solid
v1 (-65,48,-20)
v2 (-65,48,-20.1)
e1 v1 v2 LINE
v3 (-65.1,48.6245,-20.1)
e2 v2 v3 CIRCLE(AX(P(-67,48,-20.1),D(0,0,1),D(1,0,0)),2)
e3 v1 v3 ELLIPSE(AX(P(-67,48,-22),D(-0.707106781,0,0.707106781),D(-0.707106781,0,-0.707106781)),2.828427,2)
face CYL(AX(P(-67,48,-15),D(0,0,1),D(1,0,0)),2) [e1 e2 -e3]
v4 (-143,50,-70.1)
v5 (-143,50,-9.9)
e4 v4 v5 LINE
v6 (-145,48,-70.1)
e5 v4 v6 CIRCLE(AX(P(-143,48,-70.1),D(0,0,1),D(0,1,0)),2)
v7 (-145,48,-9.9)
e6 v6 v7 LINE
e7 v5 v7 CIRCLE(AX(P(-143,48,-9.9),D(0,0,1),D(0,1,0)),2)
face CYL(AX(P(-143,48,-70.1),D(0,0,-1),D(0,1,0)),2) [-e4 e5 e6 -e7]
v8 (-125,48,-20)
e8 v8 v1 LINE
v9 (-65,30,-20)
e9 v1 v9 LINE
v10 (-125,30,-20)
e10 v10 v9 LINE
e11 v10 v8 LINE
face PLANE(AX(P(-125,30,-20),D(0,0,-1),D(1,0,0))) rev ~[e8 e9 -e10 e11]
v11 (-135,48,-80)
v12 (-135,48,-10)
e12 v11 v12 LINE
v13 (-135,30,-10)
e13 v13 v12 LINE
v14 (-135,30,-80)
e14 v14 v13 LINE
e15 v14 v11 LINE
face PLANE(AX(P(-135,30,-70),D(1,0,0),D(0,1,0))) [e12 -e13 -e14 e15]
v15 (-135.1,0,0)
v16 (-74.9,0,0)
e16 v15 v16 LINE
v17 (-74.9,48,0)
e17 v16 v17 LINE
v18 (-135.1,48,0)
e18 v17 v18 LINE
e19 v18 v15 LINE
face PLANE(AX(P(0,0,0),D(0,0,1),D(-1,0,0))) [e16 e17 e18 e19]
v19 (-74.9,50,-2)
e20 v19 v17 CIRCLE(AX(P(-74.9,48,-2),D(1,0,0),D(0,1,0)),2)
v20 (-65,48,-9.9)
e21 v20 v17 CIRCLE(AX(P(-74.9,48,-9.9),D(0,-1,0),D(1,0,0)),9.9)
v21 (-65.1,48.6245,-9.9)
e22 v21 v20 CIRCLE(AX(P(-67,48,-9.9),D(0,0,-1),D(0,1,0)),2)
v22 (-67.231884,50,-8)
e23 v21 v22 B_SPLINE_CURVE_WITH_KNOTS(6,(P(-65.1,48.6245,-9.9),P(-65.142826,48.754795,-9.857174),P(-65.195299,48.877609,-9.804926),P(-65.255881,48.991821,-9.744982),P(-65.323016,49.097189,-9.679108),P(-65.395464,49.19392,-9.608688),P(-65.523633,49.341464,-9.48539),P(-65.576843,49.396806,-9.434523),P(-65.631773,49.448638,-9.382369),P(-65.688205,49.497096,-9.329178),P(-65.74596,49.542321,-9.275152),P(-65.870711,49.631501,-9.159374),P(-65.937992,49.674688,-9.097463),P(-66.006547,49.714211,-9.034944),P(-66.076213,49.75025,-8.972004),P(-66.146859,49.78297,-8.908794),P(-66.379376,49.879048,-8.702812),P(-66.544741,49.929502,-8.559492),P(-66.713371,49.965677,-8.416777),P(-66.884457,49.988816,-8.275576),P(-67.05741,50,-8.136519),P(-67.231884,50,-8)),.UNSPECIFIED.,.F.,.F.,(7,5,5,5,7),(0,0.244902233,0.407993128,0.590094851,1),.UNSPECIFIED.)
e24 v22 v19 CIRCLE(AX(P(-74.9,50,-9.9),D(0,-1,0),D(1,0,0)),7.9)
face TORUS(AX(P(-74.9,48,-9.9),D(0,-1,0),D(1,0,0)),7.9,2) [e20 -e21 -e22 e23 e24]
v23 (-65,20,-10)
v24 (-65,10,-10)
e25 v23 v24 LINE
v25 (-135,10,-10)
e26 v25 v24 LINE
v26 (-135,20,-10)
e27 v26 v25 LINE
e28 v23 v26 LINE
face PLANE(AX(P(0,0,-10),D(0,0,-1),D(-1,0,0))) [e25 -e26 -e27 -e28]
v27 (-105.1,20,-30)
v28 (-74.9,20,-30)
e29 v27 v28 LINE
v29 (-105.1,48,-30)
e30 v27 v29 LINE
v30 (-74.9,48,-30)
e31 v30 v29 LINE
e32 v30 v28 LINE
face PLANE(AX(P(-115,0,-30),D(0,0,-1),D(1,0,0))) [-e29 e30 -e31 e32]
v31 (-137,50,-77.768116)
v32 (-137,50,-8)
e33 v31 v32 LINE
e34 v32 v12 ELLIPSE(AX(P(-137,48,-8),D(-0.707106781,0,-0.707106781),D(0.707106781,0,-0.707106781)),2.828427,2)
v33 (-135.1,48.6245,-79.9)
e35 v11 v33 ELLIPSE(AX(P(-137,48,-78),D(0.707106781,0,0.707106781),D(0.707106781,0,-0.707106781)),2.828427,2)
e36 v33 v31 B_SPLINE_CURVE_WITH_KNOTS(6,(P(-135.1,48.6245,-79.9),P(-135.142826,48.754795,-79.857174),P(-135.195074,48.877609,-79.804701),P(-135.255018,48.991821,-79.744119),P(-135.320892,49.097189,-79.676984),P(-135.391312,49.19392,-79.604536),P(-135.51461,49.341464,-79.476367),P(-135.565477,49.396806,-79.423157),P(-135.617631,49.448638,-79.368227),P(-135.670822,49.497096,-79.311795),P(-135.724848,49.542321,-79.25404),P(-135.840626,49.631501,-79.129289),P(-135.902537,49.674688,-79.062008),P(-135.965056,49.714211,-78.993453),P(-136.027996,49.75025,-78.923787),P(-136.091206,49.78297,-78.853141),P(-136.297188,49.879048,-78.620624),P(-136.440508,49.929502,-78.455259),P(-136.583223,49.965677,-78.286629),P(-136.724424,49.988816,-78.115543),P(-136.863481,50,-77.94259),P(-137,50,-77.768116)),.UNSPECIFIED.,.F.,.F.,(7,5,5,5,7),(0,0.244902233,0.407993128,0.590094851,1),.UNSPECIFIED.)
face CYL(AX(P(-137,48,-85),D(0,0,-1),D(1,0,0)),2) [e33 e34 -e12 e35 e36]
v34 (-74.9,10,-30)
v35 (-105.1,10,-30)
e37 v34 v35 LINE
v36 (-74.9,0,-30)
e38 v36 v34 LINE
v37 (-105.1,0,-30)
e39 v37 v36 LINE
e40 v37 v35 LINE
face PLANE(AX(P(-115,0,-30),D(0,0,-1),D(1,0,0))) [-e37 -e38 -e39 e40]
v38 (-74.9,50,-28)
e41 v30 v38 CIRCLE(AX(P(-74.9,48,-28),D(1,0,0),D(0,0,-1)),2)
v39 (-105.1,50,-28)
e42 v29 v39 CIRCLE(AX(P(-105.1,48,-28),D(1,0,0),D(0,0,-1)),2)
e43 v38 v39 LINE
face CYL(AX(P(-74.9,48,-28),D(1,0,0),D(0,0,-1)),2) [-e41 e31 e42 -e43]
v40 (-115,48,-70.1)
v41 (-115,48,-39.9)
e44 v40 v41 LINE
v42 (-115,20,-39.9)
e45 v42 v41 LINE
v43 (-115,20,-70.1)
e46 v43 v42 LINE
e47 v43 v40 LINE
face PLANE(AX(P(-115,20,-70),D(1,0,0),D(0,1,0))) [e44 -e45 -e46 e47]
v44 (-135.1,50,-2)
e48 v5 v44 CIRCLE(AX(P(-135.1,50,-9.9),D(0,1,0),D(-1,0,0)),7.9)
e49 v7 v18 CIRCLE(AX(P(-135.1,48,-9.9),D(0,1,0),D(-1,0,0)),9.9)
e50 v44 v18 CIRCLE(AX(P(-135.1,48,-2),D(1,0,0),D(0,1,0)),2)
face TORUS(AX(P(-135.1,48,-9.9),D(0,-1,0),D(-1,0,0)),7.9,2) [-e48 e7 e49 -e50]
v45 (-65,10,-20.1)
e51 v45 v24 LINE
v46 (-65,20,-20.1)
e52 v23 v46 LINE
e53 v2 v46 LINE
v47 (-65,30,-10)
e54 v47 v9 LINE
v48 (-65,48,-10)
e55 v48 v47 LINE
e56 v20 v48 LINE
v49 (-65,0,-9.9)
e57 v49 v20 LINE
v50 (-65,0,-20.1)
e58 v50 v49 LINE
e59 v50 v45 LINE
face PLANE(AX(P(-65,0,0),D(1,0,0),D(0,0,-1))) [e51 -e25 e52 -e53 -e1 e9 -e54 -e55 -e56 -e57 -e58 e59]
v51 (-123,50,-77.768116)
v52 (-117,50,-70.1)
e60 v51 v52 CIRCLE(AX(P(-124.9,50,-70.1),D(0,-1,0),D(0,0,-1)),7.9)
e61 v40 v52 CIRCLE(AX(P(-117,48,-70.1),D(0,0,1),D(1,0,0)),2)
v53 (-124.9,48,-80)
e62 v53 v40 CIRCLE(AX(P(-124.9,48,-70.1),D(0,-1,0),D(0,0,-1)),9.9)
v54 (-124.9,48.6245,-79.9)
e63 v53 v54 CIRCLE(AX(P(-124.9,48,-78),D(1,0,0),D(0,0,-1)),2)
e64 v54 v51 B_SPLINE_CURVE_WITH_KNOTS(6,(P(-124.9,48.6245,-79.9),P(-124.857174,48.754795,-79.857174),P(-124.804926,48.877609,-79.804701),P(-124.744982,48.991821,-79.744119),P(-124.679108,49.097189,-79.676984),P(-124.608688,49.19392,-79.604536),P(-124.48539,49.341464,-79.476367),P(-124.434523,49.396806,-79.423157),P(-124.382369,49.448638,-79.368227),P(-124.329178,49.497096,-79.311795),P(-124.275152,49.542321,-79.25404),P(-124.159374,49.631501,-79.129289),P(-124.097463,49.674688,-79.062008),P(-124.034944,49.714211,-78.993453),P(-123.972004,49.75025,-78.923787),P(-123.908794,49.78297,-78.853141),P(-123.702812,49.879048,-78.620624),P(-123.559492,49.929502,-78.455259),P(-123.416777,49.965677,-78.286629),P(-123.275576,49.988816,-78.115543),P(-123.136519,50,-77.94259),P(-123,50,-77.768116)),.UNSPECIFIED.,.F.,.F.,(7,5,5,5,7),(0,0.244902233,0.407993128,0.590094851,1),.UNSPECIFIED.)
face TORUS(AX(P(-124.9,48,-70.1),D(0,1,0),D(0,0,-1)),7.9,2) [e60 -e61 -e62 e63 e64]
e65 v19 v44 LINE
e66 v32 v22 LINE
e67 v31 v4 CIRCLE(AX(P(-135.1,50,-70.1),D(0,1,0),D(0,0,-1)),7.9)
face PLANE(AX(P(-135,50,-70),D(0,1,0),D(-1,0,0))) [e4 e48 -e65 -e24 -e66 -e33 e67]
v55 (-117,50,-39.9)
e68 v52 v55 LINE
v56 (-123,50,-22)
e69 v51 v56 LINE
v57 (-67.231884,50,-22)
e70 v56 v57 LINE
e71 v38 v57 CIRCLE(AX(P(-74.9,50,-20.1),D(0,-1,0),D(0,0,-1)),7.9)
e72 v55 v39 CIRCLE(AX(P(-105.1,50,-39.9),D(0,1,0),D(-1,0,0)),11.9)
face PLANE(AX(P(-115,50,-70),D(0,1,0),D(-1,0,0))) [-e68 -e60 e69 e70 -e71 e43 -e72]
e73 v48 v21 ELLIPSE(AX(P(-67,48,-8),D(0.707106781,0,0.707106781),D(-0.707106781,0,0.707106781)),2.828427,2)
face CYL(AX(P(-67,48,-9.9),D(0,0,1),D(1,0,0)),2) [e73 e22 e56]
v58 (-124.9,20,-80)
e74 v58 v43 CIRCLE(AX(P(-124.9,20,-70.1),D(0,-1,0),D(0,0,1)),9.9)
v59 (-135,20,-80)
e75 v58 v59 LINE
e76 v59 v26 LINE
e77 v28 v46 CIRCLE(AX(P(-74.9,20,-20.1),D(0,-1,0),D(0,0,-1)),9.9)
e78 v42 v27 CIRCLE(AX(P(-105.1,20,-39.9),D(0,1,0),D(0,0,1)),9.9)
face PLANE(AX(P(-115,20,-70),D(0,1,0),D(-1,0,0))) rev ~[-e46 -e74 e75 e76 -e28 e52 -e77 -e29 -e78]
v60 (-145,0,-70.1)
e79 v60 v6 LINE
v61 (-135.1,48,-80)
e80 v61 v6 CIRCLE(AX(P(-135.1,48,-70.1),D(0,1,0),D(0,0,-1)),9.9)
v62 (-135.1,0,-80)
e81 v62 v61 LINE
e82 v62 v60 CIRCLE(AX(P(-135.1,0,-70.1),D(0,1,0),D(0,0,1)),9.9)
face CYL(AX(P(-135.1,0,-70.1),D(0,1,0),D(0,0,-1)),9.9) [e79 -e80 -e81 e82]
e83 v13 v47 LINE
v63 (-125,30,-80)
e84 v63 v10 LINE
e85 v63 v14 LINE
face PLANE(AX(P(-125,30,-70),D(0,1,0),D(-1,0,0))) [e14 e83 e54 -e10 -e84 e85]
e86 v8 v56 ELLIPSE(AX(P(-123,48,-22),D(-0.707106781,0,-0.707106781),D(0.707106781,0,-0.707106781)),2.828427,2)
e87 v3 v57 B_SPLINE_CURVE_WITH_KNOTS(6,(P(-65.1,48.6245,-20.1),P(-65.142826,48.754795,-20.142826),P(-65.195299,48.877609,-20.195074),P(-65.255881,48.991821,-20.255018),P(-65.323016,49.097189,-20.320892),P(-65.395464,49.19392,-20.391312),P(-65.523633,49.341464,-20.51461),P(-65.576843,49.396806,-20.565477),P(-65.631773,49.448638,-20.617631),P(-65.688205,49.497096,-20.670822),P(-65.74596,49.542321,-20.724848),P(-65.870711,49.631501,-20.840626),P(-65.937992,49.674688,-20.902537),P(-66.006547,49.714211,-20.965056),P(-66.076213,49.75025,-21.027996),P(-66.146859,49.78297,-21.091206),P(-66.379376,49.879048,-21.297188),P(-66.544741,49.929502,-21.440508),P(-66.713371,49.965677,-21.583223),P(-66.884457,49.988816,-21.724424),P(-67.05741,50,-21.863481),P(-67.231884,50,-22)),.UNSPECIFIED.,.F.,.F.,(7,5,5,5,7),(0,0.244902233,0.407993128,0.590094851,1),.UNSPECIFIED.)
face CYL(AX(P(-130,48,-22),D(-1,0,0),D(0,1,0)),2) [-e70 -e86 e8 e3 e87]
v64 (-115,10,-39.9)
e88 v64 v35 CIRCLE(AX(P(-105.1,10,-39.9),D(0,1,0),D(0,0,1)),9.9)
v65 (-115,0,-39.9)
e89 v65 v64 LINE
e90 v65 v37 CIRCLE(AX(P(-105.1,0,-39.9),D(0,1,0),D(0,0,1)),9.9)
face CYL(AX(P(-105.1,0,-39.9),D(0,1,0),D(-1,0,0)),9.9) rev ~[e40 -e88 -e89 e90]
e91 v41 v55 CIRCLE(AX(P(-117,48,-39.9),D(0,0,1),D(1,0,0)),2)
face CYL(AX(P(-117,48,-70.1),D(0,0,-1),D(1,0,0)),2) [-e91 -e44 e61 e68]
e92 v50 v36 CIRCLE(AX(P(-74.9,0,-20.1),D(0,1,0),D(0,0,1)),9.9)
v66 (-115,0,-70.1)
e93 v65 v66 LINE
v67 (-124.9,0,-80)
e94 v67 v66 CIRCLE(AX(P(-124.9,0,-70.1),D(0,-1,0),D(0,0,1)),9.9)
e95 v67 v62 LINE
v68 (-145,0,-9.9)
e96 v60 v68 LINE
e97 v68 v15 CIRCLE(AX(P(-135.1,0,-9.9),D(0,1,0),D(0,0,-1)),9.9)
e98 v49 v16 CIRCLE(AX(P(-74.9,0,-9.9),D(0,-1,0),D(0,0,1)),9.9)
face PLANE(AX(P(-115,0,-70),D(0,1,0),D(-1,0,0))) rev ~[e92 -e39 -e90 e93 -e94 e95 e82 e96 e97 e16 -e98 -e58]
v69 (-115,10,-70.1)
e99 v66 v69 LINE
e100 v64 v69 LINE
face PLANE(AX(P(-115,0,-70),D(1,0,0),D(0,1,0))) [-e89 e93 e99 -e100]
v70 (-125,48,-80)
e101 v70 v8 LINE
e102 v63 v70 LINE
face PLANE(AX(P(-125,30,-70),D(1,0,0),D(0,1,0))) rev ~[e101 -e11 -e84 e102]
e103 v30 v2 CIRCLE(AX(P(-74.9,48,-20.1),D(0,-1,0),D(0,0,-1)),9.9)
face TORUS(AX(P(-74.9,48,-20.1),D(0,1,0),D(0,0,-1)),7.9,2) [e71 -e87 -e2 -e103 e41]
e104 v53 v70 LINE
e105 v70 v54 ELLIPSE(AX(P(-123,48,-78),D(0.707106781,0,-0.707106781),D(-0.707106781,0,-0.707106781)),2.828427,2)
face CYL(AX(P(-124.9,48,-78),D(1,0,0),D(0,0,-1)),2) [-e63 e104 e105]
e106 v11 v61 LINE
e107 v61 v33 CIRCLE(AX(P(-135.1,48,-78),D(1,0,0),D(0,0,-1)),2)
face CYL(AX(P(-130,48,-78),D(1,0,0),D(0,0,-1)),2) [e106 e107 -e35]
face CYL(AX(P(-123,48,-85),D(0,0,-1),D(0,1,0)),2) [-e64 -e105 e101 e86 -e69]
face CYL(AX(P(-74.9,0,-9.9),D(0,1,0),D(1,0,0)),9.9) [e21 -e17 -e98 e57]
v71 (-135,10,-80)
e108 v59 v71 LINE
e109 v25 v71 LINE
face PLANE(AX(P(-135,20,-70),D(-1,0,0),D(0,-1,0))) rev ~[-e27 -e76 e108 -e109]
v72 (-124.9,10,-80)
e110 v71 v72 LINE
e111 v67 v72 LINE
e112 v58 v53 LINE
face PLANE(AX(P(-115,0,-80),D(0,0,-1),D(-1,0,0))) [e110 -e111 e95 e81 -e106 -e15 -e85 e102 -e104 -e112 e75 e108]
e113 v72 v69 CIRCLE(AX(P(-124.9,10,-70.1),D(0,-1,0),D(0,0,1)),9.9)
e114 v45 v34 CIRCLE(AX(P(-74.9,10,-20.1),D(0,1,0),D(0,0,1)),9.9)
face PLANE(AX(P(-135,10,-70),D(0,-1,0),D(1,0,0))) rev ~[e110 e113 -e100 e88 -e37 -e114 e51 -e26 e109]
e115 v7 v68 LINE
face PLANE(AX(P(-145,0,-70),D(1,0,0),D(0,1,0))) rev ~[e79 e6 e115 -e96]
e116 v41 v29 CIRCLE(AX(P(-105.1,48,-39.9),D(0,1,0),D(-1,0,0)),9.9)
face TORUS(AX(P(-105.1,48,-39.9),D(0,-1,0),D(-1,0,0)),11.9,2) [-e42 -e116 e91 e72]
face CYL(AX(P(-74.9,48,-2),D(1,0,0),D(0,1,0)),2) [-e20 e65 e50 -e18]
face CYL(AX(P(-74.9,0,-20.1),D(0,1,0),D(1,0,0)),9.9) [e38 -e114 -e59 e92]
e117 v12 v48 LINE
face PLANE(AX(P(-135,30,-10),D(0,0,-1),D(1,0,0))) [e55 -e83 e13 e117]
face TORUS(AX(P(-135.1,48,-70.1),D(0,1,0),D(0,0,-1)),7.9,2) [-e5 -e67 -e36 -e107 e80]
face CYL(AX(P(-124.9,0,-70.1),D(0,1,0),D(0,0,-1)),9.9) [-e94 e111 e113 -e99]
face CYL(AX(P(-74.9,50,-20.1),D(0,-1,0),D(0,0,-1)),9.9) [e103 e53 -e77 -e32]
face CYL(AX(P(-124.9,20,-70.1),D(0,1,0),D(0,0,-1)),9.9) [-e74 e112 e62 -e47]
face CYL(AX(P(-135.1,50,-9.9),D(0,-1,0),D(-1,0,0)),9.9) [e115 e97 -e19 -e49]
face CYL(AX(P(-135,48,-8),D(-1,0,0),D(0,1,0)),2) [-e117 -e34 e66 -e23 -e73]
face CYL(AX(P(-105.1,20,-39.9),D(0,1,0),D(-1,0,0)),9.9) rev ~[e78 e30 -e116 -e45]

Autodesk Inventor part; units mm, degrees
ref_plane "YZ Plane" through (0, 0, 0) normal (1, 0, 0) x (0, 1, 0)
ref_plane "XZ Plane" through (0, 0, 0) normal (0, 1, 0) x (-1, 0, 0)
ref_plane "XY Plane" through (0, 0, 0) normal (0, 0, 1) x (1, 0, 0)
sketch "Sketch1" plane through (0, 0, 0) normal (0, 1, 0) x (-1, 0, 0)
  line L0 (0, 0) -> (145, 0)
  line L1 (145, 0) -> (145, -30)
  line L2 (145, -30) -> (0, -30)
  line L3 (0, -30) -> (0, 0)
  line L4 (145, 0) -> (115, 0)
  line L5 (115, 0) -> (115, -70)
  line L6 (115, -70) -> (145, -70)
  line L7 (145, -70) -> (145, 0)
  point P0 (115, -30)
  dimension "d0" = 145
  dimension "d1" = 30
  dimension "d2" = 30
  dimension "d3" = 70
extrude "Extrusion1" add sketch "Sketch1" along normal blind 30
sketch "Sketch2" plane through (0, 0, -30) normal (0, 0, -1) x (-1, 0, 0)
  line L0 (0, 20) -> (135, 20)
  line L1 (135, 20) -> (135, 10)
  line L2 (135, 10) -> (0, 10)
  line L3 (0, 10) -> (0, 20)
  dimension "d32" = 135
  dimension "d33" = 10
extrude "Extrusion2" cut sketch "Sketch2" along normal blind 50 and the other way blind 20
sketch "Sketch4" plane through (0, 30, 0) normal (0, 1, 0) x (1, 0, 0)
  line L0 (0, 0) -> (-145, 0)
  line L1 (-145, 0) -> (-145, 10)
  line L2 (-145, 10) -> (0, 10)
  line L3 (0, 10) -> (0, 0)
  line L4 (-115, 70) -> (-145, 70) projected
  line L5 (-145, 70) -> (-135, 70)
  line L6 (-135, 70) -> (-135, 10)
  line L7 (-135, 10) -> (-145, 10)
  line L8 (-145, 10) -> (-145, 70)
  line L9 (-115, 30) -> (-115, 70) projected
  line L10 (-115, 70) -> (-125, 70)
  line L11 (-125, 70) -> (-125, 30)
  line L12 (-125, 30) -> (-115, 30)
  line L13 (-115, 30) -> (-115, 70)
  line L14 (0, 30) -> (-125, 30)
  line L15 (-125, 30) -> (-125, 20)
  line L16 (-125, 20) -> (0, 20)
  line L17 (0, 20) -> (0, 30)
  dimension "d22" = 145
  dimension "d23" = 10
  dimension "d24" = 10
  dimension "d25" = 60
  dimension "d26" = 10
  dimension "d27" = 40
  dimension "d28" = 125
  dimension "d29" = 10
extrude "Extrusion4" add sketch "Sketch4" along normal blind 20
sketch "Sketch5" plane through (0, 0, 0) normal (1, 0, 0) x (0, 0, -1)
  line L0 (0, 0) -> (0, 50) projected
  line L1 (30, 0) -> (30, 10) projected
  line L2 (0, 50) -> (30, 50)
  line L3 (30, 50) -> (30, 0)
  line L4 (30, 0) -> (0, 0)
  line L5 (0, 0) -> (0, 50)
extrude "Extrusion5" cut sketch "Sketch5" against normal blind 65
sketch "Sketch6" plane through (-115, 0, -70) normal (0, 0, -1) x (-1, 0, 0)
  line L0 (20, 10) -> (0, 10) projected
  line L1 (0, 0) -> (0, 10) projected
  line L2 (0, 0) -> (30, 0) projected
  line L3 (30, 0) -> (30, 50) projected
  line L4 (20, 50) -> (30, 50) projected
  line L5 (20, 30) -> (20, 50) projected
  line L6 (10, 30) -> (20, 30) projected
  line L7 (10, 30) -> (10, 50) projected
  line L8 (0, 50) -> (10, 50) projected
  line L9 (0, 20) -> (0, 50) projected
  line L10 (0, 20) -> (20, 20) projected
  line L11 (20, 20) -> (20, 10) projected
  point P0 (-115, 0)
extrude "Extrusion6" add sketch "Sketch6" along normal blind 10
fillet "Fillet1" radius 9.9 9 edges at (-115, 35, -30) (-115, 5, -30) (-115, 35, -80) (-115, 5, -80) (-65, 35, -30) (-65, 5, -30) (-145, 25, -80) (-65, 25, 0) (-145, 25, 0)
fillet "Fillet2" radius 2 18 edges at (-67.8996, 50, -2.8996) (-65, 50, -9.95) (-142.1004, 50, -2.8996) (-145, 50, -40) (-142.1004, 50, -77.1004) (-135.05, 50, -80) (-105, 50, 0) (-100, 50, -10) (-125, 50, -50) (-95, 50, -20) (-112.1004, 50, -32.8996) (-115, 50, -55) (-117.8996, 50, -77.1004) (-124.95, 50, -80) (-67.8996, 50, -27.1004) (-65, 50, -20.05) (-90, 50, -30) (-135, 50, -45)
properties part number "TSU_Corner1_Clamp"
